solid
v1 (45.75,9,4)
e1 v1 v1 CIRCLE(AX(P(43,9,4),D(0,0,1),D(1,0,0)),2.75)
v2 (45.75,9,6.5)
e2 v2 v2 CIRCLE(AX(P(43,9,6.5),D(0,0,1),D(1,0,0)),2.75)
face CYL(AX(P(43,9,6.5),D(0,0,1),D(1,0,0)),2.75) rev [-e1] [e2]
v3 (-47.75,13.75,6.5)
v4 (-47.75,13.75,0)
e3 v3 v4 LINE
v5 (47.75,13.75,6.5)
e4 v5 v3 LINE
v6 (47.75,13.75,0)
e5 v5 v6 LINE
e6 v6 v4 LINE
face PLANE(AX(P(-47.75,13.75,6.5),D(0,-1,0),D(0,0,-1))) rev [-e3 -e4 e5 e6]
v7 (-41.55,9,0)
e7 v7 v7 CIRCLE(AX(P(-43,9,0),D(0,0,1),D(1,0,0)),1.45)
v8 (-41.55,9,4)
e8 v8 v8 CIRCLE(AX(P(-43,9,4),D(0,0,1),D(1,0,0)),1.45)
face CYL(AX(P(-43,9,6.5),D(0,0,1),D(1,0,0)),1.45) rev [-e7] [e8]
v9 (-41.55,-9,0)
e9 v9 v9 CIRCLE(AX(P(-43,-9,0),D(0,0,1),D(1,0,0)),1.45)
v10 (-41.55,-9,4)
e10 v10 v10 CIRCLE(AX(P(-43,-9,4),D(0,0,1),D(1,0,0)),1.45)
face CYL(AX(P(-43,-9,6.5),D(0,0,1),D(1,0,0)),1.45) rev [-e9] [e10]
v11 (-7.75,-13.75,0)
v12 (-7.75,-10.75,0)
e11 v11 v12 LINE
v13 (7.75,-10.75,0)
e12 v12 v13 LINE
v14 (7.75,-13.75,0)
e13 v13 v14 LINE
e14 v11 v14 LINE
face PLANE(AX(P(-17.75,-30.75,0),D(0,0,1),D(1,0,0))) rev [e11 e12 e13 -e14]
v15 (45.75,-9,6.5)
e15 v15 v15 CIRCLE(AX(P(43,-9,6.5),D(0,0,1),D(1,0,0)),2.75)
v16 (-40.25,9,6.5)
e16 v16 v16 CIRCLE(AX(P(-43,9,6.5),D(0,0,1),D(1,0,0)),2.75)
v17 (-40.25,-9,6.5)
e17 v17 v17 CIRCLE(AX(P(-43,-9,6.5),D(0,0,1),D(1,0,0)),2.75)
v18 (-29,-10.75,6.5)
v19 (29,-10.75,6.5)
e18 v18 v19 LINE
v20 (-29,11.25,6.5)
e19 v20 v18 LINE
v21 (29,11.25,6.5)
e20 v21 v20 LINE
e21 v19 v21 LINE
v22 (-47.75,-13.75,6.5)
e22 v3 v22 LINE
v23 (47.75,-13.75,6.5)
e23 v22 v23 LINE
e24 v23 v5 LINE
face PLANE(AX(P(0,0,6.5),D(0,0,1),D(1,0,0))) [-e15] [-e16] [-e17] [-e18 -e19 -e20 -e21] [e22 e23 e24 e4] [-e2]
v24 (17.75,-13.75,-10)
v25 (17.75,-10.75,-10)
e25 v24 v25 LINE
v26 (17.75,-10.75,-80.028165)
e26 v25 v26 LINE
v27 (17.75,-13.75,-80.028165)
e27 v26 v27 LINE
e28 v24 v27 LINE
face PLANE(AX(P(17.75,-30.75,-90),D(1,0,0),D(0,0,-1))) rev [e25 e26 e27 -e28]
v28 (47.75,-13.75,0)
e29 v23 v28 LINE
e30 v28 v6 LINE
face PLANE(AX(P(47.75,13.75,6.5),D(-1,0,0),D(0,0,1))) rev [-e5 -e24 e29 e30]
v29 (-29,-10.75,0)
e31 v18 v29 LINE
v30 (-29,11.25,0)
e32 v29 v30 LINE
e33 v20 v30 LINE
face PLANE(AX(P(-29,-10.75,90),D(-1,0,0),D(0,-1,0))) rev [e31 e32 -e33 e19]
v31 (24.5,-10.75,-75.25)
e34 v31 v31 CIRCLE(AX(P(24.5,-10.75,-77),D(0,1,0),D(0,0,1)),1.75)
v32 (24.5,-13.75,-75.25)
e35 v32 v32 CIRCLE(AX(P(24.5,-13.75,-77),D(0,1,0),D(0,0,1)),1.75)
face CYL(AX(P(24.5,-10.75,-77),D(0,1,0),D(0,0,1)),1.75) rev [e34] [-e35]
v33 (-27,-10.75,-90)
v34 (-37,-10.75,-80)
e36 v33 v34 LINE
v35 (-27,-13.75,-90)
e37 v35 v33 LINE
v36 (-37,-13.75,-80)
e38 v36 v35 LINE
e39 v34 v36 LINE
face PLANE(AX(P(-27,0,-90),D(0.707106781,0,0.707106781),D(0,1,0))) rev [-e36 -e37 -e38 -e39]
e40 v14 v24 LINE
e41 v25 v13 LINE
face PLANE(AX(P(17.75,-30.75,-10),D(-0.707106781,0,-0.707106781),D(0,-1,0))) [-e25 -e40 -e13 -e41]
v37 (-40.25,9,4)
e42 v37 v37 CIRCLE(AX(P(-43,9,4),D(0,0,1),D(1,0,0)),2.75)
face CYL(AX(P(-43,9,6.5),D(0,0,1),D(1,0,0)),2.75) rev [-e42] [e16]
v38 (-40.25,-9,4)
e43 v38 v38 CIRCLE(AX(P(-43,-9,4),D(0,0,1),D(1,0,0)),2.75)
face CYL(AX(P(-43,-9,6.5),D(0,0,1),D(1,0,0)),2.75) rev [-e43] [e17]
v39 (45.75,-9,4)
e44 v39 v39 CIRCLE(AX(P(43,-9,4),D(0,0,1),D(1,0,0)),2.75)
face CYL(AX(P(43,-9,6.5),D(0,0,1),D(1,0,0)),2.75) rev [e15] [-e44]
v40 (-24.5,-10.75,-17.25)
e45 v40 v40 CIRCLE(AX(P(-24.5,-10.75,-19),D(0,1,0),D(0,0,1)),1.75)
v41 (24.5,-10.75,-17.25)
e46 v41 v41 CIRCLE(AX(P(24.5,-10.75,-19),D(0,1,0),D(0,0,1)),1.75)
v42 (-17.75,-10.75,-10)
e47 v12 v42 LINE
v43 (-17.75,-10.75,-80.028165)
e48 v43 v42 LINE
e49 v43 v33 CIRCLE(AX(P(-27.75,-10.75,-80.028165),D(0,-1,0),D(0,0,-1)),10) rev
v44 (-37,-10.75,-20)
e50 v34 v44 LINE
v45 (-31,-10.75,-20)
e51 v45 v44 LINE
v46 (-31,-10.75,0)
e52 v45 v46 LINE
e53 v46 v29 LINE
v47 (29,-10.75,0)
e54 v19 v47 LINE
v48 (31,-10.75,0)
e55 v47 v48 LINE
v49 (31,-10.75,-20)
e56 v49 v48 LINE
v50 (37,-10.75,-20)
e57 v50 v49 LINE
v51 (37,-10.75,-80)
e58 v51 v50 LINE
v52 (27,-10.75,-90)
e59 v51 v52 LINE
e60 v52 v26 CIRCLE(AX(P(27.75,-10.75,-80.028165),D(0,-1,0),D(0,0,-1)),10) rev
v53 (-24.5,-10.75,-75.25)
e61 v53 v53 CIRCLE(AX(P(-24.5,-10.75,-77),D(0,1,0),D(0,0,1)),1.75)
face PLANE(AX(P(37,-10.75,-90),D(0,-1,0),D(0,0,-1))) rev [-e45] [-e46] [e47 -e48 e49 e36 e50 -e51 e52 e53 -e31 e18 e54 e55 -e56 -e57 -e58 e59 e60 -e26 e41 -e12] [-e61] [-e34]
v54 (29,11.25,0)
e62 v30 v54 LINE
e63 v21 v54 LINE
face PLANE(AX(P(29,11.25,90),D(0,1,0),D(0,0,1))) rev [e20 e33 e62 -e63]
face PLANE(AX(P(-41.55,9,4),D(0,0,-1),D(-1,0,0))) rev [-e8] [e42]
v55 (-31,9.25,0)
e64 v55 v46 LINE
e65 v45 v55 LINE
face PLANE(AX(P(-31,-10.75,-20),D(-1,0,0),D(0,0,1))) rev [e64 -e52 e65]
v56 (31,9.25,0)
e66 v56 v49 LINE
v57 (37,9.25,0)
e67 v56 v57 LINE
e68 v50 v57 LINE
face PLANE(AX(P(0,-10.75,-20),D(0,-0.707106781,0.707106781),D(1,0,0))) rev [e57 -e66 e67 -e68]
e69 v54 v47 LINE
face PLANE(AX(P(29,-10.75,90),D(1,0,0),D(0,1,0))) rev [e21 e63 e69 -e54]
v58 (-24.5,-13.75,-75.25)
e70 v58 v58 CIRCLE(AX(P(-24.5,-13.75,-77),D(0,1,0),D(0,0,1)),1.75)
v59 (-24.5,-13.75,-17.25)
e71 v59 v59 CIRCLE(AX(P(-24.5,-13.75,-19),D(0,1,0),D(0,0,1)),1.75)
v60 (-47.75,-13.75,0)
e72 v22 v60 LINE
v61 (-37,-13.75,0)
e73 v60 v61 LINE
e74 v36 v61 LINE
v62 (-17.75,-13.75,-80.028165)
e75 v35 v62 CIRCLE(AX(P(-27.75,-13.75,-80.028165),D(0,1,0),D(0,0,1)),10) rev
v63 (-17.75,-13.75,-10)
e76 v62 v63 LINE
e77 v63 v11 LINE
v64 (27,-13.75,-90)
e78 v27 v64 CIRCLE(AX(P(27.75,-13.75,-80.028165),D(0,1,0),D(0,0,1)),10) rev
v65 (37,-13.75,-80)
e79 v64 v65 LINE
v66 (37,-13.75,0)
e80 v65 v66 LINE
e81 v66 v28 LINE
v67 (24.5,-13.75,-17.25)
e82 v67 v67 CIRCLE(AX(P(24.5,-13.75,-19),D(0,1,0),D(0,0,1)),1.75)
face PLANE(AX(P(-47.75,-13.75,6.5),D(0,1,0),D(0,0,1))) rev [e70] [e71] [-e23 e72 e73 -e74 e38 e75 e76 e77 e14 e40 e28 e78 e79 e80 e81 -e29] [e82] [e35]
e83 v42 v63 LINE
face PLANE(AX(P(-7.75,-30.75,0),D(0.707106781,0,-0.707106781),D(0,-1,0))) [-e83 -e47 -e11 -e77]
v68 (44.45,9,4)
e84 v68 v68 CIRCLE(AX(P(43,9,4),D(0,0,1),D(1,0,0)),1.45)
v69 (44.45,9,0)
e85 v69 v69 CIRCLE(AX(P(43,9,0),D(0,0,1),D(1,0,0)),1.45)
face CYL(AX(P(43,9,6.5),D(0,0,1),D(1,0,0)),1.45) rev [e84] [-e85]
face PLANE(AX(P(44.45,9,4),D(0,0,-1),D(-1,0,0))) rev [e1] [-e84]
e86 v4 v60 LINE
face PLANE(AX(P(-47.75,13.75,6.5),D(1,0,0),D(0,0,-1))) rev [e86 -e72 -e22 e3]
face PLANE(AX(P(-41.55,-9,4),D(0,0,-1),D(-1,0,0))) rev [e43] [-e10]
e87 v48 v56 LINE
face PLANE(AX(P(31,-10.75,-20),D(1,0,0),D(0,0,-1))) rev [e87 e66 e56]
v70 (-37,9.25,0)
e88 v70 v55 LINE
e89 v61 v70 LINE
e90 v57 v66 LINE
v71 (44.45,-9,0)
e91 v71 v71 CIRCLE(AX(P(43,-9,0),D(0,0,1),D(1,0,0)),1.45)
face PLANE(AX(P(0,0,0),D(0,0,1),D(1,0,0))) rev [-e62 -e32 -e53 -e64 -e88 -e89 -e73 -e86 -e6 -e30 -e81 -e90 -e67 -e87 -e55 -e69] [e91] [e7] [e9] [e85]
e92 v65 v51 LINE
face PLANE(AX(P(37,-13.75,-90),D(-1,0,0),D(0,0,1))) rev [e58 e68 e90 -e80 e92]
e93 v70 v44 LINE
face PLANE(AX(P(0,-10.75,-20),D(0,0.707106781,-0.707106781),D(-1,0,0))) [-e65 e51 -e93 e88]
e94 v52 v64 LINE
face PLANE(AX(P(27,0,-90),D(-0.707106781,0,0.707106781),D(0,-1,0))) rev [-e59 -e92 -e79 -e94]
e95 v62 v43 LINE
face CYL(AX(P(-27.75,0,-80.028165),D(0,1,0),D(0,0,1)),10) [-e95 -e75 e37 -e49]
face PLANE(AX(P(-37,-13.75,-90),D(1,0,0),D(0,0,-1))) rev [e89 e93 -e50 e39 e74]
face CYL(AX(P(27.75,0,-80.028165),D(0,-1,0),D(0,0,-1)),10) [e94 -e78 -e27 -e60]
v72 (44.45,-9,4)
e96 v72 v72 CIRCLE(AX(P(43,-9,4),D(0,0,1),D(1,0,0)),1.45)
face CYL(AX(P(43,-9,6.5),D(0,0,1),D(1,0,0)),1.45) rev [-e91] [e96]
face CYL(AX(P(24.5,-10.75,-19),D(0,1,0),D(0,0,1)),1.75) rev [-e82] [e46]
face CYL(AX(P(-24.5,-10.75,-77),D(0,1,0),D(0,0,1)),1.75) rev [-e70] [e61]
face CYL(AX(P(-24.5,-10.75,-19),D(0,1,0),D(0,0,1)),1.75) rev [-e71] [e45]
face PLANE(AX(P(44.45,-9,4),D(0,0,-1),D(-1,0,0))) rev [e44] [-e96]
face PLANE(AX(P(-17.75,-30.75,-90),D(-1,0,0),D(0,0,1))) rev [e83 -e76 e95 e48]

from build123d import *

# Parameters (mm, degrees)
SKETCH1_W                        = 95.5
SKETCH1_H                        = 27.5
BOSS_EXTRUDE1_DEPTH              = 6.5
SKETCH2_W                        = 74
SKETCH2_H                        = 3
BOSS_EXTRUDE2_DEPTH              = 90
SKETCH3_W                        = 58
SKETCH3_H                        = 22
CUT_EXTRUDE1_DEPTH               = 90
CBORE_FOR_M2_5_SHCS1_D           = 2.9
CBORE_FOR_M2_5_SHCS1_DEPTH       = 10.1
CBORE_FOR_M2_5_SHCS1_CBORE_D     = 5.5
CBORE_FOR_M2_5_SHCS1_CBORE_DEPTH = 2.5
CBORE_FOR_M2_5_SHCS1_TIP         = 0.871247898
SKETCH7_W                        = 6
SKETCH7_H                        = 20
BOSS_EXTRUDE3_DEPTH              = 20
CHAMFER1_SIZE                    = 20
F_1_0_3_5_DIAMETER_HOLE1_D       = 3.5
F_1_0_3_5_DIAMETER_HOLE1_DEPTH   = 10.1
F_1_0_3_5_DIAMETER_HOLE1_TIP     = 1.051506083
SKETCH12_W                       = 35.5
SKETCH12_H                       = 90
CUT_EXTRUDE2_DEPTH               = 20
CHAMFER2_SIZE                    = 10
FILLET1_R                        = 10


# Some blends are built 0.0001 mm under size
with BuildPart() as part:
    # Sketch1 → Boss-Extrude1 (new body)
    with BuildSketch(Plane.XY):
        Rectangle(SKETCH1_W, SKETCH1_H)
    extrude(amount=BOSS_EXTRUDE1_DEPTH)

    # Sketch2 → Boss-Extrude2 (add)
    with BuildSketch(Plane(origin=(0, 0, 0), x_dir=(-1, 0, 0), z_dir=(0, 0, -1))):
        with Locations((0, -12.25)):
            Rectangle(SKETCH2_W, SKETCH2_H)
    extrude(amount=BOSS_EXTRUDE2_DEPTH)

    # Sketch3 → Cut-Extrude1 (cut)
    with BuildSketch(Plane(origin=(0, 0, 0), x_dir=(-1, 0, 0), z_dir=(0, 0, -1))):
        with Locations((0, 0.25)):
            Rectangle(SKETCH3_W, SKETCH3_H)
    extrude(amount=-CUT_EXTRUDE1_DEPTH, mode=Mode.SUBTRACT)

    # CBORE for M2.5 SHCS1
    with Locations(Plane.XY.offset(6.5)):
        with Locations((-43, 9), (-43, -9), (43, 9), (43, -9)):
            CounterBoreHole(CBORE_FOR_M2_5_SHCS1_D / 2, CBORE_FOR_M2_5_SHCS1_CBORE_D / 2, CBORE_FOR_M2_5_SHCS1_CBORE_DEPTH, depth=CBORE_FOR_M2_5_SHCS1_DEPTH)
            with Locations((0, 0, -(CBORE_FOR_M2_5_SHCS1_DEPTH + CBORE_FOR_M2_5_SHCS1_TIP / 2))):  # 118° drill point
                Cone(0, CBORE_FOR_M2_5_SHCS1_D / 2, CBORE_FOR_M2_5_SHCS1_TIP, mode=Mode.SUBTRACT)

    # Sketch7 → Boss-Extrude3 (add)
    with BuildSketch(Plane(origin=(0, 0, 0), x_dir=(-1, 0, 0), z_dir=(0, 0, -1))):
        with Locations((-34, -0.75)):
            Rectangle(SKETCH7_W, SKETCH7_H)
        with Locations((34, -0.75)):
            Rectangle(SKETCH7_W, SKETCH7_H)
    extrude(amount=BOSS_EXTRUDE3_DEPTH)

    # Chamfer1
    chamfer1_edges = [part.edges().sort_by_distance(p)[0] for p in [
        (34, 9.25, -20),
        (-34, 9.25, -20),
    ]]
    chamfer(chamfer1_edges, length=CHAMFER1_SIZE - 0.0001)  # a hair under: the kernel refuses the full size

    # Ø1.0 (3.5) Diameter Hole1
    with Locations(Plane(origin=(0, -10.75, 0), x_dir=(1, 0, 0), z_dir=(0, 1, 0))):
        with Locations((-24.5, 77), (24.5, 77), (-24.5, 19), (24.5, 19)):
            Hole(F_1_0_3_5_DIAMETER_HOLE1_D / 2, depth=F_1_0_3_5_DIAMETER_HOLE1_DEPTH)
            with Locations((0, 0, -(F_1_0_3_5_DIAMETER_HOLE1_DEPTH + F_1_0_3_5_DIAMETER_HOLE1_TIP / 2))):  # 118° drill point
                Cone(0, F_1_0_3_5_DIAMETER_HOLE1_D / 2, F_1_0_3_5_DIAMETER_HOLE1_TIP, mode=Mode.SUBTRACT)

    # Sketch12 → Cut-Extrude2 (cut)
    with BuildSketch(Plane(origin=(0, -10.75, 0), x_dir=(1, 0, 0), z_dir=(0, 1, 0))):
        with Locations((0, 45)):
            Rectangle(SKETCH12_W, SKETCH12_H)
    extrude(amount=-CUT_EXTRUDE2_DEPTH, mode=Mode.SUBTRACT)

    # Chamfer2
    chamfer2_edges = [part.edges().sort_by_distance(p)[0] for p in [
        (17.75, -12.25, 0),
        (-17.75, -12.25, 0),
        (37, -12.25, -90),
        (-37, -12.25, -90),
    ]]
    chamfer(chamfer2_edges, length=CHAMFER2_SIZE)

    # Fillet1
    # the kernel refuses this fillet: 10 mm, written as the material it takes off along each edge
    with BuildSketch(Plane(origin=(-17.75, 14.179588344, -90), x_dir=(0, 0, 1), z_dir=(0, -1, 0))) as fillet1_piece_1:
        with BuildLine():
            CenterArc((9.971835338, 10), FILLET1_R, 184.301222305, 85.698777695)
            Line((0, 9.25), (-0.199436707, 9.235))
            ThreePointArc((-0.199436707, 9.235), (-0.2, 4.625), (-0.2, 0))
            Line((-0.2, 0), (0, -0.2))
            Line((0, -0.2), (9.971835338, -0.2))
            Line((9.971835338, -0.2), (9.971835338, 0))
        make_face()
    extrude(amount=52.859176688, mode=Mode.SUBTRACT)
    with BuildSketch(Plane(origin=(17.75, 14.179588344, -90), x_dir=(1, 0, 0), z_dir=(0, -1, 0))) as fillet1_piece_2:
        with BuildLine():
            CenterArc((10, 9.971835338), FILLET1_R, 180, 85.698777695)
            Line((0, 9.971835338), (-0.2, 9.971835338))
            Line((-0.2, 9.971835338), (-0.2, 0))
            Line((-0.2, 0), (0, -0.2))
            ThreePointArc((0, -0.2), (4.625, -0.2), (9.235, -0.199436707))
            Line((9.235, -0.199436707), (9.25, 0))
        make_face()
    extrude(amount=52.859176688, mode=Mode.SUBTRACT)


solid = part.part
